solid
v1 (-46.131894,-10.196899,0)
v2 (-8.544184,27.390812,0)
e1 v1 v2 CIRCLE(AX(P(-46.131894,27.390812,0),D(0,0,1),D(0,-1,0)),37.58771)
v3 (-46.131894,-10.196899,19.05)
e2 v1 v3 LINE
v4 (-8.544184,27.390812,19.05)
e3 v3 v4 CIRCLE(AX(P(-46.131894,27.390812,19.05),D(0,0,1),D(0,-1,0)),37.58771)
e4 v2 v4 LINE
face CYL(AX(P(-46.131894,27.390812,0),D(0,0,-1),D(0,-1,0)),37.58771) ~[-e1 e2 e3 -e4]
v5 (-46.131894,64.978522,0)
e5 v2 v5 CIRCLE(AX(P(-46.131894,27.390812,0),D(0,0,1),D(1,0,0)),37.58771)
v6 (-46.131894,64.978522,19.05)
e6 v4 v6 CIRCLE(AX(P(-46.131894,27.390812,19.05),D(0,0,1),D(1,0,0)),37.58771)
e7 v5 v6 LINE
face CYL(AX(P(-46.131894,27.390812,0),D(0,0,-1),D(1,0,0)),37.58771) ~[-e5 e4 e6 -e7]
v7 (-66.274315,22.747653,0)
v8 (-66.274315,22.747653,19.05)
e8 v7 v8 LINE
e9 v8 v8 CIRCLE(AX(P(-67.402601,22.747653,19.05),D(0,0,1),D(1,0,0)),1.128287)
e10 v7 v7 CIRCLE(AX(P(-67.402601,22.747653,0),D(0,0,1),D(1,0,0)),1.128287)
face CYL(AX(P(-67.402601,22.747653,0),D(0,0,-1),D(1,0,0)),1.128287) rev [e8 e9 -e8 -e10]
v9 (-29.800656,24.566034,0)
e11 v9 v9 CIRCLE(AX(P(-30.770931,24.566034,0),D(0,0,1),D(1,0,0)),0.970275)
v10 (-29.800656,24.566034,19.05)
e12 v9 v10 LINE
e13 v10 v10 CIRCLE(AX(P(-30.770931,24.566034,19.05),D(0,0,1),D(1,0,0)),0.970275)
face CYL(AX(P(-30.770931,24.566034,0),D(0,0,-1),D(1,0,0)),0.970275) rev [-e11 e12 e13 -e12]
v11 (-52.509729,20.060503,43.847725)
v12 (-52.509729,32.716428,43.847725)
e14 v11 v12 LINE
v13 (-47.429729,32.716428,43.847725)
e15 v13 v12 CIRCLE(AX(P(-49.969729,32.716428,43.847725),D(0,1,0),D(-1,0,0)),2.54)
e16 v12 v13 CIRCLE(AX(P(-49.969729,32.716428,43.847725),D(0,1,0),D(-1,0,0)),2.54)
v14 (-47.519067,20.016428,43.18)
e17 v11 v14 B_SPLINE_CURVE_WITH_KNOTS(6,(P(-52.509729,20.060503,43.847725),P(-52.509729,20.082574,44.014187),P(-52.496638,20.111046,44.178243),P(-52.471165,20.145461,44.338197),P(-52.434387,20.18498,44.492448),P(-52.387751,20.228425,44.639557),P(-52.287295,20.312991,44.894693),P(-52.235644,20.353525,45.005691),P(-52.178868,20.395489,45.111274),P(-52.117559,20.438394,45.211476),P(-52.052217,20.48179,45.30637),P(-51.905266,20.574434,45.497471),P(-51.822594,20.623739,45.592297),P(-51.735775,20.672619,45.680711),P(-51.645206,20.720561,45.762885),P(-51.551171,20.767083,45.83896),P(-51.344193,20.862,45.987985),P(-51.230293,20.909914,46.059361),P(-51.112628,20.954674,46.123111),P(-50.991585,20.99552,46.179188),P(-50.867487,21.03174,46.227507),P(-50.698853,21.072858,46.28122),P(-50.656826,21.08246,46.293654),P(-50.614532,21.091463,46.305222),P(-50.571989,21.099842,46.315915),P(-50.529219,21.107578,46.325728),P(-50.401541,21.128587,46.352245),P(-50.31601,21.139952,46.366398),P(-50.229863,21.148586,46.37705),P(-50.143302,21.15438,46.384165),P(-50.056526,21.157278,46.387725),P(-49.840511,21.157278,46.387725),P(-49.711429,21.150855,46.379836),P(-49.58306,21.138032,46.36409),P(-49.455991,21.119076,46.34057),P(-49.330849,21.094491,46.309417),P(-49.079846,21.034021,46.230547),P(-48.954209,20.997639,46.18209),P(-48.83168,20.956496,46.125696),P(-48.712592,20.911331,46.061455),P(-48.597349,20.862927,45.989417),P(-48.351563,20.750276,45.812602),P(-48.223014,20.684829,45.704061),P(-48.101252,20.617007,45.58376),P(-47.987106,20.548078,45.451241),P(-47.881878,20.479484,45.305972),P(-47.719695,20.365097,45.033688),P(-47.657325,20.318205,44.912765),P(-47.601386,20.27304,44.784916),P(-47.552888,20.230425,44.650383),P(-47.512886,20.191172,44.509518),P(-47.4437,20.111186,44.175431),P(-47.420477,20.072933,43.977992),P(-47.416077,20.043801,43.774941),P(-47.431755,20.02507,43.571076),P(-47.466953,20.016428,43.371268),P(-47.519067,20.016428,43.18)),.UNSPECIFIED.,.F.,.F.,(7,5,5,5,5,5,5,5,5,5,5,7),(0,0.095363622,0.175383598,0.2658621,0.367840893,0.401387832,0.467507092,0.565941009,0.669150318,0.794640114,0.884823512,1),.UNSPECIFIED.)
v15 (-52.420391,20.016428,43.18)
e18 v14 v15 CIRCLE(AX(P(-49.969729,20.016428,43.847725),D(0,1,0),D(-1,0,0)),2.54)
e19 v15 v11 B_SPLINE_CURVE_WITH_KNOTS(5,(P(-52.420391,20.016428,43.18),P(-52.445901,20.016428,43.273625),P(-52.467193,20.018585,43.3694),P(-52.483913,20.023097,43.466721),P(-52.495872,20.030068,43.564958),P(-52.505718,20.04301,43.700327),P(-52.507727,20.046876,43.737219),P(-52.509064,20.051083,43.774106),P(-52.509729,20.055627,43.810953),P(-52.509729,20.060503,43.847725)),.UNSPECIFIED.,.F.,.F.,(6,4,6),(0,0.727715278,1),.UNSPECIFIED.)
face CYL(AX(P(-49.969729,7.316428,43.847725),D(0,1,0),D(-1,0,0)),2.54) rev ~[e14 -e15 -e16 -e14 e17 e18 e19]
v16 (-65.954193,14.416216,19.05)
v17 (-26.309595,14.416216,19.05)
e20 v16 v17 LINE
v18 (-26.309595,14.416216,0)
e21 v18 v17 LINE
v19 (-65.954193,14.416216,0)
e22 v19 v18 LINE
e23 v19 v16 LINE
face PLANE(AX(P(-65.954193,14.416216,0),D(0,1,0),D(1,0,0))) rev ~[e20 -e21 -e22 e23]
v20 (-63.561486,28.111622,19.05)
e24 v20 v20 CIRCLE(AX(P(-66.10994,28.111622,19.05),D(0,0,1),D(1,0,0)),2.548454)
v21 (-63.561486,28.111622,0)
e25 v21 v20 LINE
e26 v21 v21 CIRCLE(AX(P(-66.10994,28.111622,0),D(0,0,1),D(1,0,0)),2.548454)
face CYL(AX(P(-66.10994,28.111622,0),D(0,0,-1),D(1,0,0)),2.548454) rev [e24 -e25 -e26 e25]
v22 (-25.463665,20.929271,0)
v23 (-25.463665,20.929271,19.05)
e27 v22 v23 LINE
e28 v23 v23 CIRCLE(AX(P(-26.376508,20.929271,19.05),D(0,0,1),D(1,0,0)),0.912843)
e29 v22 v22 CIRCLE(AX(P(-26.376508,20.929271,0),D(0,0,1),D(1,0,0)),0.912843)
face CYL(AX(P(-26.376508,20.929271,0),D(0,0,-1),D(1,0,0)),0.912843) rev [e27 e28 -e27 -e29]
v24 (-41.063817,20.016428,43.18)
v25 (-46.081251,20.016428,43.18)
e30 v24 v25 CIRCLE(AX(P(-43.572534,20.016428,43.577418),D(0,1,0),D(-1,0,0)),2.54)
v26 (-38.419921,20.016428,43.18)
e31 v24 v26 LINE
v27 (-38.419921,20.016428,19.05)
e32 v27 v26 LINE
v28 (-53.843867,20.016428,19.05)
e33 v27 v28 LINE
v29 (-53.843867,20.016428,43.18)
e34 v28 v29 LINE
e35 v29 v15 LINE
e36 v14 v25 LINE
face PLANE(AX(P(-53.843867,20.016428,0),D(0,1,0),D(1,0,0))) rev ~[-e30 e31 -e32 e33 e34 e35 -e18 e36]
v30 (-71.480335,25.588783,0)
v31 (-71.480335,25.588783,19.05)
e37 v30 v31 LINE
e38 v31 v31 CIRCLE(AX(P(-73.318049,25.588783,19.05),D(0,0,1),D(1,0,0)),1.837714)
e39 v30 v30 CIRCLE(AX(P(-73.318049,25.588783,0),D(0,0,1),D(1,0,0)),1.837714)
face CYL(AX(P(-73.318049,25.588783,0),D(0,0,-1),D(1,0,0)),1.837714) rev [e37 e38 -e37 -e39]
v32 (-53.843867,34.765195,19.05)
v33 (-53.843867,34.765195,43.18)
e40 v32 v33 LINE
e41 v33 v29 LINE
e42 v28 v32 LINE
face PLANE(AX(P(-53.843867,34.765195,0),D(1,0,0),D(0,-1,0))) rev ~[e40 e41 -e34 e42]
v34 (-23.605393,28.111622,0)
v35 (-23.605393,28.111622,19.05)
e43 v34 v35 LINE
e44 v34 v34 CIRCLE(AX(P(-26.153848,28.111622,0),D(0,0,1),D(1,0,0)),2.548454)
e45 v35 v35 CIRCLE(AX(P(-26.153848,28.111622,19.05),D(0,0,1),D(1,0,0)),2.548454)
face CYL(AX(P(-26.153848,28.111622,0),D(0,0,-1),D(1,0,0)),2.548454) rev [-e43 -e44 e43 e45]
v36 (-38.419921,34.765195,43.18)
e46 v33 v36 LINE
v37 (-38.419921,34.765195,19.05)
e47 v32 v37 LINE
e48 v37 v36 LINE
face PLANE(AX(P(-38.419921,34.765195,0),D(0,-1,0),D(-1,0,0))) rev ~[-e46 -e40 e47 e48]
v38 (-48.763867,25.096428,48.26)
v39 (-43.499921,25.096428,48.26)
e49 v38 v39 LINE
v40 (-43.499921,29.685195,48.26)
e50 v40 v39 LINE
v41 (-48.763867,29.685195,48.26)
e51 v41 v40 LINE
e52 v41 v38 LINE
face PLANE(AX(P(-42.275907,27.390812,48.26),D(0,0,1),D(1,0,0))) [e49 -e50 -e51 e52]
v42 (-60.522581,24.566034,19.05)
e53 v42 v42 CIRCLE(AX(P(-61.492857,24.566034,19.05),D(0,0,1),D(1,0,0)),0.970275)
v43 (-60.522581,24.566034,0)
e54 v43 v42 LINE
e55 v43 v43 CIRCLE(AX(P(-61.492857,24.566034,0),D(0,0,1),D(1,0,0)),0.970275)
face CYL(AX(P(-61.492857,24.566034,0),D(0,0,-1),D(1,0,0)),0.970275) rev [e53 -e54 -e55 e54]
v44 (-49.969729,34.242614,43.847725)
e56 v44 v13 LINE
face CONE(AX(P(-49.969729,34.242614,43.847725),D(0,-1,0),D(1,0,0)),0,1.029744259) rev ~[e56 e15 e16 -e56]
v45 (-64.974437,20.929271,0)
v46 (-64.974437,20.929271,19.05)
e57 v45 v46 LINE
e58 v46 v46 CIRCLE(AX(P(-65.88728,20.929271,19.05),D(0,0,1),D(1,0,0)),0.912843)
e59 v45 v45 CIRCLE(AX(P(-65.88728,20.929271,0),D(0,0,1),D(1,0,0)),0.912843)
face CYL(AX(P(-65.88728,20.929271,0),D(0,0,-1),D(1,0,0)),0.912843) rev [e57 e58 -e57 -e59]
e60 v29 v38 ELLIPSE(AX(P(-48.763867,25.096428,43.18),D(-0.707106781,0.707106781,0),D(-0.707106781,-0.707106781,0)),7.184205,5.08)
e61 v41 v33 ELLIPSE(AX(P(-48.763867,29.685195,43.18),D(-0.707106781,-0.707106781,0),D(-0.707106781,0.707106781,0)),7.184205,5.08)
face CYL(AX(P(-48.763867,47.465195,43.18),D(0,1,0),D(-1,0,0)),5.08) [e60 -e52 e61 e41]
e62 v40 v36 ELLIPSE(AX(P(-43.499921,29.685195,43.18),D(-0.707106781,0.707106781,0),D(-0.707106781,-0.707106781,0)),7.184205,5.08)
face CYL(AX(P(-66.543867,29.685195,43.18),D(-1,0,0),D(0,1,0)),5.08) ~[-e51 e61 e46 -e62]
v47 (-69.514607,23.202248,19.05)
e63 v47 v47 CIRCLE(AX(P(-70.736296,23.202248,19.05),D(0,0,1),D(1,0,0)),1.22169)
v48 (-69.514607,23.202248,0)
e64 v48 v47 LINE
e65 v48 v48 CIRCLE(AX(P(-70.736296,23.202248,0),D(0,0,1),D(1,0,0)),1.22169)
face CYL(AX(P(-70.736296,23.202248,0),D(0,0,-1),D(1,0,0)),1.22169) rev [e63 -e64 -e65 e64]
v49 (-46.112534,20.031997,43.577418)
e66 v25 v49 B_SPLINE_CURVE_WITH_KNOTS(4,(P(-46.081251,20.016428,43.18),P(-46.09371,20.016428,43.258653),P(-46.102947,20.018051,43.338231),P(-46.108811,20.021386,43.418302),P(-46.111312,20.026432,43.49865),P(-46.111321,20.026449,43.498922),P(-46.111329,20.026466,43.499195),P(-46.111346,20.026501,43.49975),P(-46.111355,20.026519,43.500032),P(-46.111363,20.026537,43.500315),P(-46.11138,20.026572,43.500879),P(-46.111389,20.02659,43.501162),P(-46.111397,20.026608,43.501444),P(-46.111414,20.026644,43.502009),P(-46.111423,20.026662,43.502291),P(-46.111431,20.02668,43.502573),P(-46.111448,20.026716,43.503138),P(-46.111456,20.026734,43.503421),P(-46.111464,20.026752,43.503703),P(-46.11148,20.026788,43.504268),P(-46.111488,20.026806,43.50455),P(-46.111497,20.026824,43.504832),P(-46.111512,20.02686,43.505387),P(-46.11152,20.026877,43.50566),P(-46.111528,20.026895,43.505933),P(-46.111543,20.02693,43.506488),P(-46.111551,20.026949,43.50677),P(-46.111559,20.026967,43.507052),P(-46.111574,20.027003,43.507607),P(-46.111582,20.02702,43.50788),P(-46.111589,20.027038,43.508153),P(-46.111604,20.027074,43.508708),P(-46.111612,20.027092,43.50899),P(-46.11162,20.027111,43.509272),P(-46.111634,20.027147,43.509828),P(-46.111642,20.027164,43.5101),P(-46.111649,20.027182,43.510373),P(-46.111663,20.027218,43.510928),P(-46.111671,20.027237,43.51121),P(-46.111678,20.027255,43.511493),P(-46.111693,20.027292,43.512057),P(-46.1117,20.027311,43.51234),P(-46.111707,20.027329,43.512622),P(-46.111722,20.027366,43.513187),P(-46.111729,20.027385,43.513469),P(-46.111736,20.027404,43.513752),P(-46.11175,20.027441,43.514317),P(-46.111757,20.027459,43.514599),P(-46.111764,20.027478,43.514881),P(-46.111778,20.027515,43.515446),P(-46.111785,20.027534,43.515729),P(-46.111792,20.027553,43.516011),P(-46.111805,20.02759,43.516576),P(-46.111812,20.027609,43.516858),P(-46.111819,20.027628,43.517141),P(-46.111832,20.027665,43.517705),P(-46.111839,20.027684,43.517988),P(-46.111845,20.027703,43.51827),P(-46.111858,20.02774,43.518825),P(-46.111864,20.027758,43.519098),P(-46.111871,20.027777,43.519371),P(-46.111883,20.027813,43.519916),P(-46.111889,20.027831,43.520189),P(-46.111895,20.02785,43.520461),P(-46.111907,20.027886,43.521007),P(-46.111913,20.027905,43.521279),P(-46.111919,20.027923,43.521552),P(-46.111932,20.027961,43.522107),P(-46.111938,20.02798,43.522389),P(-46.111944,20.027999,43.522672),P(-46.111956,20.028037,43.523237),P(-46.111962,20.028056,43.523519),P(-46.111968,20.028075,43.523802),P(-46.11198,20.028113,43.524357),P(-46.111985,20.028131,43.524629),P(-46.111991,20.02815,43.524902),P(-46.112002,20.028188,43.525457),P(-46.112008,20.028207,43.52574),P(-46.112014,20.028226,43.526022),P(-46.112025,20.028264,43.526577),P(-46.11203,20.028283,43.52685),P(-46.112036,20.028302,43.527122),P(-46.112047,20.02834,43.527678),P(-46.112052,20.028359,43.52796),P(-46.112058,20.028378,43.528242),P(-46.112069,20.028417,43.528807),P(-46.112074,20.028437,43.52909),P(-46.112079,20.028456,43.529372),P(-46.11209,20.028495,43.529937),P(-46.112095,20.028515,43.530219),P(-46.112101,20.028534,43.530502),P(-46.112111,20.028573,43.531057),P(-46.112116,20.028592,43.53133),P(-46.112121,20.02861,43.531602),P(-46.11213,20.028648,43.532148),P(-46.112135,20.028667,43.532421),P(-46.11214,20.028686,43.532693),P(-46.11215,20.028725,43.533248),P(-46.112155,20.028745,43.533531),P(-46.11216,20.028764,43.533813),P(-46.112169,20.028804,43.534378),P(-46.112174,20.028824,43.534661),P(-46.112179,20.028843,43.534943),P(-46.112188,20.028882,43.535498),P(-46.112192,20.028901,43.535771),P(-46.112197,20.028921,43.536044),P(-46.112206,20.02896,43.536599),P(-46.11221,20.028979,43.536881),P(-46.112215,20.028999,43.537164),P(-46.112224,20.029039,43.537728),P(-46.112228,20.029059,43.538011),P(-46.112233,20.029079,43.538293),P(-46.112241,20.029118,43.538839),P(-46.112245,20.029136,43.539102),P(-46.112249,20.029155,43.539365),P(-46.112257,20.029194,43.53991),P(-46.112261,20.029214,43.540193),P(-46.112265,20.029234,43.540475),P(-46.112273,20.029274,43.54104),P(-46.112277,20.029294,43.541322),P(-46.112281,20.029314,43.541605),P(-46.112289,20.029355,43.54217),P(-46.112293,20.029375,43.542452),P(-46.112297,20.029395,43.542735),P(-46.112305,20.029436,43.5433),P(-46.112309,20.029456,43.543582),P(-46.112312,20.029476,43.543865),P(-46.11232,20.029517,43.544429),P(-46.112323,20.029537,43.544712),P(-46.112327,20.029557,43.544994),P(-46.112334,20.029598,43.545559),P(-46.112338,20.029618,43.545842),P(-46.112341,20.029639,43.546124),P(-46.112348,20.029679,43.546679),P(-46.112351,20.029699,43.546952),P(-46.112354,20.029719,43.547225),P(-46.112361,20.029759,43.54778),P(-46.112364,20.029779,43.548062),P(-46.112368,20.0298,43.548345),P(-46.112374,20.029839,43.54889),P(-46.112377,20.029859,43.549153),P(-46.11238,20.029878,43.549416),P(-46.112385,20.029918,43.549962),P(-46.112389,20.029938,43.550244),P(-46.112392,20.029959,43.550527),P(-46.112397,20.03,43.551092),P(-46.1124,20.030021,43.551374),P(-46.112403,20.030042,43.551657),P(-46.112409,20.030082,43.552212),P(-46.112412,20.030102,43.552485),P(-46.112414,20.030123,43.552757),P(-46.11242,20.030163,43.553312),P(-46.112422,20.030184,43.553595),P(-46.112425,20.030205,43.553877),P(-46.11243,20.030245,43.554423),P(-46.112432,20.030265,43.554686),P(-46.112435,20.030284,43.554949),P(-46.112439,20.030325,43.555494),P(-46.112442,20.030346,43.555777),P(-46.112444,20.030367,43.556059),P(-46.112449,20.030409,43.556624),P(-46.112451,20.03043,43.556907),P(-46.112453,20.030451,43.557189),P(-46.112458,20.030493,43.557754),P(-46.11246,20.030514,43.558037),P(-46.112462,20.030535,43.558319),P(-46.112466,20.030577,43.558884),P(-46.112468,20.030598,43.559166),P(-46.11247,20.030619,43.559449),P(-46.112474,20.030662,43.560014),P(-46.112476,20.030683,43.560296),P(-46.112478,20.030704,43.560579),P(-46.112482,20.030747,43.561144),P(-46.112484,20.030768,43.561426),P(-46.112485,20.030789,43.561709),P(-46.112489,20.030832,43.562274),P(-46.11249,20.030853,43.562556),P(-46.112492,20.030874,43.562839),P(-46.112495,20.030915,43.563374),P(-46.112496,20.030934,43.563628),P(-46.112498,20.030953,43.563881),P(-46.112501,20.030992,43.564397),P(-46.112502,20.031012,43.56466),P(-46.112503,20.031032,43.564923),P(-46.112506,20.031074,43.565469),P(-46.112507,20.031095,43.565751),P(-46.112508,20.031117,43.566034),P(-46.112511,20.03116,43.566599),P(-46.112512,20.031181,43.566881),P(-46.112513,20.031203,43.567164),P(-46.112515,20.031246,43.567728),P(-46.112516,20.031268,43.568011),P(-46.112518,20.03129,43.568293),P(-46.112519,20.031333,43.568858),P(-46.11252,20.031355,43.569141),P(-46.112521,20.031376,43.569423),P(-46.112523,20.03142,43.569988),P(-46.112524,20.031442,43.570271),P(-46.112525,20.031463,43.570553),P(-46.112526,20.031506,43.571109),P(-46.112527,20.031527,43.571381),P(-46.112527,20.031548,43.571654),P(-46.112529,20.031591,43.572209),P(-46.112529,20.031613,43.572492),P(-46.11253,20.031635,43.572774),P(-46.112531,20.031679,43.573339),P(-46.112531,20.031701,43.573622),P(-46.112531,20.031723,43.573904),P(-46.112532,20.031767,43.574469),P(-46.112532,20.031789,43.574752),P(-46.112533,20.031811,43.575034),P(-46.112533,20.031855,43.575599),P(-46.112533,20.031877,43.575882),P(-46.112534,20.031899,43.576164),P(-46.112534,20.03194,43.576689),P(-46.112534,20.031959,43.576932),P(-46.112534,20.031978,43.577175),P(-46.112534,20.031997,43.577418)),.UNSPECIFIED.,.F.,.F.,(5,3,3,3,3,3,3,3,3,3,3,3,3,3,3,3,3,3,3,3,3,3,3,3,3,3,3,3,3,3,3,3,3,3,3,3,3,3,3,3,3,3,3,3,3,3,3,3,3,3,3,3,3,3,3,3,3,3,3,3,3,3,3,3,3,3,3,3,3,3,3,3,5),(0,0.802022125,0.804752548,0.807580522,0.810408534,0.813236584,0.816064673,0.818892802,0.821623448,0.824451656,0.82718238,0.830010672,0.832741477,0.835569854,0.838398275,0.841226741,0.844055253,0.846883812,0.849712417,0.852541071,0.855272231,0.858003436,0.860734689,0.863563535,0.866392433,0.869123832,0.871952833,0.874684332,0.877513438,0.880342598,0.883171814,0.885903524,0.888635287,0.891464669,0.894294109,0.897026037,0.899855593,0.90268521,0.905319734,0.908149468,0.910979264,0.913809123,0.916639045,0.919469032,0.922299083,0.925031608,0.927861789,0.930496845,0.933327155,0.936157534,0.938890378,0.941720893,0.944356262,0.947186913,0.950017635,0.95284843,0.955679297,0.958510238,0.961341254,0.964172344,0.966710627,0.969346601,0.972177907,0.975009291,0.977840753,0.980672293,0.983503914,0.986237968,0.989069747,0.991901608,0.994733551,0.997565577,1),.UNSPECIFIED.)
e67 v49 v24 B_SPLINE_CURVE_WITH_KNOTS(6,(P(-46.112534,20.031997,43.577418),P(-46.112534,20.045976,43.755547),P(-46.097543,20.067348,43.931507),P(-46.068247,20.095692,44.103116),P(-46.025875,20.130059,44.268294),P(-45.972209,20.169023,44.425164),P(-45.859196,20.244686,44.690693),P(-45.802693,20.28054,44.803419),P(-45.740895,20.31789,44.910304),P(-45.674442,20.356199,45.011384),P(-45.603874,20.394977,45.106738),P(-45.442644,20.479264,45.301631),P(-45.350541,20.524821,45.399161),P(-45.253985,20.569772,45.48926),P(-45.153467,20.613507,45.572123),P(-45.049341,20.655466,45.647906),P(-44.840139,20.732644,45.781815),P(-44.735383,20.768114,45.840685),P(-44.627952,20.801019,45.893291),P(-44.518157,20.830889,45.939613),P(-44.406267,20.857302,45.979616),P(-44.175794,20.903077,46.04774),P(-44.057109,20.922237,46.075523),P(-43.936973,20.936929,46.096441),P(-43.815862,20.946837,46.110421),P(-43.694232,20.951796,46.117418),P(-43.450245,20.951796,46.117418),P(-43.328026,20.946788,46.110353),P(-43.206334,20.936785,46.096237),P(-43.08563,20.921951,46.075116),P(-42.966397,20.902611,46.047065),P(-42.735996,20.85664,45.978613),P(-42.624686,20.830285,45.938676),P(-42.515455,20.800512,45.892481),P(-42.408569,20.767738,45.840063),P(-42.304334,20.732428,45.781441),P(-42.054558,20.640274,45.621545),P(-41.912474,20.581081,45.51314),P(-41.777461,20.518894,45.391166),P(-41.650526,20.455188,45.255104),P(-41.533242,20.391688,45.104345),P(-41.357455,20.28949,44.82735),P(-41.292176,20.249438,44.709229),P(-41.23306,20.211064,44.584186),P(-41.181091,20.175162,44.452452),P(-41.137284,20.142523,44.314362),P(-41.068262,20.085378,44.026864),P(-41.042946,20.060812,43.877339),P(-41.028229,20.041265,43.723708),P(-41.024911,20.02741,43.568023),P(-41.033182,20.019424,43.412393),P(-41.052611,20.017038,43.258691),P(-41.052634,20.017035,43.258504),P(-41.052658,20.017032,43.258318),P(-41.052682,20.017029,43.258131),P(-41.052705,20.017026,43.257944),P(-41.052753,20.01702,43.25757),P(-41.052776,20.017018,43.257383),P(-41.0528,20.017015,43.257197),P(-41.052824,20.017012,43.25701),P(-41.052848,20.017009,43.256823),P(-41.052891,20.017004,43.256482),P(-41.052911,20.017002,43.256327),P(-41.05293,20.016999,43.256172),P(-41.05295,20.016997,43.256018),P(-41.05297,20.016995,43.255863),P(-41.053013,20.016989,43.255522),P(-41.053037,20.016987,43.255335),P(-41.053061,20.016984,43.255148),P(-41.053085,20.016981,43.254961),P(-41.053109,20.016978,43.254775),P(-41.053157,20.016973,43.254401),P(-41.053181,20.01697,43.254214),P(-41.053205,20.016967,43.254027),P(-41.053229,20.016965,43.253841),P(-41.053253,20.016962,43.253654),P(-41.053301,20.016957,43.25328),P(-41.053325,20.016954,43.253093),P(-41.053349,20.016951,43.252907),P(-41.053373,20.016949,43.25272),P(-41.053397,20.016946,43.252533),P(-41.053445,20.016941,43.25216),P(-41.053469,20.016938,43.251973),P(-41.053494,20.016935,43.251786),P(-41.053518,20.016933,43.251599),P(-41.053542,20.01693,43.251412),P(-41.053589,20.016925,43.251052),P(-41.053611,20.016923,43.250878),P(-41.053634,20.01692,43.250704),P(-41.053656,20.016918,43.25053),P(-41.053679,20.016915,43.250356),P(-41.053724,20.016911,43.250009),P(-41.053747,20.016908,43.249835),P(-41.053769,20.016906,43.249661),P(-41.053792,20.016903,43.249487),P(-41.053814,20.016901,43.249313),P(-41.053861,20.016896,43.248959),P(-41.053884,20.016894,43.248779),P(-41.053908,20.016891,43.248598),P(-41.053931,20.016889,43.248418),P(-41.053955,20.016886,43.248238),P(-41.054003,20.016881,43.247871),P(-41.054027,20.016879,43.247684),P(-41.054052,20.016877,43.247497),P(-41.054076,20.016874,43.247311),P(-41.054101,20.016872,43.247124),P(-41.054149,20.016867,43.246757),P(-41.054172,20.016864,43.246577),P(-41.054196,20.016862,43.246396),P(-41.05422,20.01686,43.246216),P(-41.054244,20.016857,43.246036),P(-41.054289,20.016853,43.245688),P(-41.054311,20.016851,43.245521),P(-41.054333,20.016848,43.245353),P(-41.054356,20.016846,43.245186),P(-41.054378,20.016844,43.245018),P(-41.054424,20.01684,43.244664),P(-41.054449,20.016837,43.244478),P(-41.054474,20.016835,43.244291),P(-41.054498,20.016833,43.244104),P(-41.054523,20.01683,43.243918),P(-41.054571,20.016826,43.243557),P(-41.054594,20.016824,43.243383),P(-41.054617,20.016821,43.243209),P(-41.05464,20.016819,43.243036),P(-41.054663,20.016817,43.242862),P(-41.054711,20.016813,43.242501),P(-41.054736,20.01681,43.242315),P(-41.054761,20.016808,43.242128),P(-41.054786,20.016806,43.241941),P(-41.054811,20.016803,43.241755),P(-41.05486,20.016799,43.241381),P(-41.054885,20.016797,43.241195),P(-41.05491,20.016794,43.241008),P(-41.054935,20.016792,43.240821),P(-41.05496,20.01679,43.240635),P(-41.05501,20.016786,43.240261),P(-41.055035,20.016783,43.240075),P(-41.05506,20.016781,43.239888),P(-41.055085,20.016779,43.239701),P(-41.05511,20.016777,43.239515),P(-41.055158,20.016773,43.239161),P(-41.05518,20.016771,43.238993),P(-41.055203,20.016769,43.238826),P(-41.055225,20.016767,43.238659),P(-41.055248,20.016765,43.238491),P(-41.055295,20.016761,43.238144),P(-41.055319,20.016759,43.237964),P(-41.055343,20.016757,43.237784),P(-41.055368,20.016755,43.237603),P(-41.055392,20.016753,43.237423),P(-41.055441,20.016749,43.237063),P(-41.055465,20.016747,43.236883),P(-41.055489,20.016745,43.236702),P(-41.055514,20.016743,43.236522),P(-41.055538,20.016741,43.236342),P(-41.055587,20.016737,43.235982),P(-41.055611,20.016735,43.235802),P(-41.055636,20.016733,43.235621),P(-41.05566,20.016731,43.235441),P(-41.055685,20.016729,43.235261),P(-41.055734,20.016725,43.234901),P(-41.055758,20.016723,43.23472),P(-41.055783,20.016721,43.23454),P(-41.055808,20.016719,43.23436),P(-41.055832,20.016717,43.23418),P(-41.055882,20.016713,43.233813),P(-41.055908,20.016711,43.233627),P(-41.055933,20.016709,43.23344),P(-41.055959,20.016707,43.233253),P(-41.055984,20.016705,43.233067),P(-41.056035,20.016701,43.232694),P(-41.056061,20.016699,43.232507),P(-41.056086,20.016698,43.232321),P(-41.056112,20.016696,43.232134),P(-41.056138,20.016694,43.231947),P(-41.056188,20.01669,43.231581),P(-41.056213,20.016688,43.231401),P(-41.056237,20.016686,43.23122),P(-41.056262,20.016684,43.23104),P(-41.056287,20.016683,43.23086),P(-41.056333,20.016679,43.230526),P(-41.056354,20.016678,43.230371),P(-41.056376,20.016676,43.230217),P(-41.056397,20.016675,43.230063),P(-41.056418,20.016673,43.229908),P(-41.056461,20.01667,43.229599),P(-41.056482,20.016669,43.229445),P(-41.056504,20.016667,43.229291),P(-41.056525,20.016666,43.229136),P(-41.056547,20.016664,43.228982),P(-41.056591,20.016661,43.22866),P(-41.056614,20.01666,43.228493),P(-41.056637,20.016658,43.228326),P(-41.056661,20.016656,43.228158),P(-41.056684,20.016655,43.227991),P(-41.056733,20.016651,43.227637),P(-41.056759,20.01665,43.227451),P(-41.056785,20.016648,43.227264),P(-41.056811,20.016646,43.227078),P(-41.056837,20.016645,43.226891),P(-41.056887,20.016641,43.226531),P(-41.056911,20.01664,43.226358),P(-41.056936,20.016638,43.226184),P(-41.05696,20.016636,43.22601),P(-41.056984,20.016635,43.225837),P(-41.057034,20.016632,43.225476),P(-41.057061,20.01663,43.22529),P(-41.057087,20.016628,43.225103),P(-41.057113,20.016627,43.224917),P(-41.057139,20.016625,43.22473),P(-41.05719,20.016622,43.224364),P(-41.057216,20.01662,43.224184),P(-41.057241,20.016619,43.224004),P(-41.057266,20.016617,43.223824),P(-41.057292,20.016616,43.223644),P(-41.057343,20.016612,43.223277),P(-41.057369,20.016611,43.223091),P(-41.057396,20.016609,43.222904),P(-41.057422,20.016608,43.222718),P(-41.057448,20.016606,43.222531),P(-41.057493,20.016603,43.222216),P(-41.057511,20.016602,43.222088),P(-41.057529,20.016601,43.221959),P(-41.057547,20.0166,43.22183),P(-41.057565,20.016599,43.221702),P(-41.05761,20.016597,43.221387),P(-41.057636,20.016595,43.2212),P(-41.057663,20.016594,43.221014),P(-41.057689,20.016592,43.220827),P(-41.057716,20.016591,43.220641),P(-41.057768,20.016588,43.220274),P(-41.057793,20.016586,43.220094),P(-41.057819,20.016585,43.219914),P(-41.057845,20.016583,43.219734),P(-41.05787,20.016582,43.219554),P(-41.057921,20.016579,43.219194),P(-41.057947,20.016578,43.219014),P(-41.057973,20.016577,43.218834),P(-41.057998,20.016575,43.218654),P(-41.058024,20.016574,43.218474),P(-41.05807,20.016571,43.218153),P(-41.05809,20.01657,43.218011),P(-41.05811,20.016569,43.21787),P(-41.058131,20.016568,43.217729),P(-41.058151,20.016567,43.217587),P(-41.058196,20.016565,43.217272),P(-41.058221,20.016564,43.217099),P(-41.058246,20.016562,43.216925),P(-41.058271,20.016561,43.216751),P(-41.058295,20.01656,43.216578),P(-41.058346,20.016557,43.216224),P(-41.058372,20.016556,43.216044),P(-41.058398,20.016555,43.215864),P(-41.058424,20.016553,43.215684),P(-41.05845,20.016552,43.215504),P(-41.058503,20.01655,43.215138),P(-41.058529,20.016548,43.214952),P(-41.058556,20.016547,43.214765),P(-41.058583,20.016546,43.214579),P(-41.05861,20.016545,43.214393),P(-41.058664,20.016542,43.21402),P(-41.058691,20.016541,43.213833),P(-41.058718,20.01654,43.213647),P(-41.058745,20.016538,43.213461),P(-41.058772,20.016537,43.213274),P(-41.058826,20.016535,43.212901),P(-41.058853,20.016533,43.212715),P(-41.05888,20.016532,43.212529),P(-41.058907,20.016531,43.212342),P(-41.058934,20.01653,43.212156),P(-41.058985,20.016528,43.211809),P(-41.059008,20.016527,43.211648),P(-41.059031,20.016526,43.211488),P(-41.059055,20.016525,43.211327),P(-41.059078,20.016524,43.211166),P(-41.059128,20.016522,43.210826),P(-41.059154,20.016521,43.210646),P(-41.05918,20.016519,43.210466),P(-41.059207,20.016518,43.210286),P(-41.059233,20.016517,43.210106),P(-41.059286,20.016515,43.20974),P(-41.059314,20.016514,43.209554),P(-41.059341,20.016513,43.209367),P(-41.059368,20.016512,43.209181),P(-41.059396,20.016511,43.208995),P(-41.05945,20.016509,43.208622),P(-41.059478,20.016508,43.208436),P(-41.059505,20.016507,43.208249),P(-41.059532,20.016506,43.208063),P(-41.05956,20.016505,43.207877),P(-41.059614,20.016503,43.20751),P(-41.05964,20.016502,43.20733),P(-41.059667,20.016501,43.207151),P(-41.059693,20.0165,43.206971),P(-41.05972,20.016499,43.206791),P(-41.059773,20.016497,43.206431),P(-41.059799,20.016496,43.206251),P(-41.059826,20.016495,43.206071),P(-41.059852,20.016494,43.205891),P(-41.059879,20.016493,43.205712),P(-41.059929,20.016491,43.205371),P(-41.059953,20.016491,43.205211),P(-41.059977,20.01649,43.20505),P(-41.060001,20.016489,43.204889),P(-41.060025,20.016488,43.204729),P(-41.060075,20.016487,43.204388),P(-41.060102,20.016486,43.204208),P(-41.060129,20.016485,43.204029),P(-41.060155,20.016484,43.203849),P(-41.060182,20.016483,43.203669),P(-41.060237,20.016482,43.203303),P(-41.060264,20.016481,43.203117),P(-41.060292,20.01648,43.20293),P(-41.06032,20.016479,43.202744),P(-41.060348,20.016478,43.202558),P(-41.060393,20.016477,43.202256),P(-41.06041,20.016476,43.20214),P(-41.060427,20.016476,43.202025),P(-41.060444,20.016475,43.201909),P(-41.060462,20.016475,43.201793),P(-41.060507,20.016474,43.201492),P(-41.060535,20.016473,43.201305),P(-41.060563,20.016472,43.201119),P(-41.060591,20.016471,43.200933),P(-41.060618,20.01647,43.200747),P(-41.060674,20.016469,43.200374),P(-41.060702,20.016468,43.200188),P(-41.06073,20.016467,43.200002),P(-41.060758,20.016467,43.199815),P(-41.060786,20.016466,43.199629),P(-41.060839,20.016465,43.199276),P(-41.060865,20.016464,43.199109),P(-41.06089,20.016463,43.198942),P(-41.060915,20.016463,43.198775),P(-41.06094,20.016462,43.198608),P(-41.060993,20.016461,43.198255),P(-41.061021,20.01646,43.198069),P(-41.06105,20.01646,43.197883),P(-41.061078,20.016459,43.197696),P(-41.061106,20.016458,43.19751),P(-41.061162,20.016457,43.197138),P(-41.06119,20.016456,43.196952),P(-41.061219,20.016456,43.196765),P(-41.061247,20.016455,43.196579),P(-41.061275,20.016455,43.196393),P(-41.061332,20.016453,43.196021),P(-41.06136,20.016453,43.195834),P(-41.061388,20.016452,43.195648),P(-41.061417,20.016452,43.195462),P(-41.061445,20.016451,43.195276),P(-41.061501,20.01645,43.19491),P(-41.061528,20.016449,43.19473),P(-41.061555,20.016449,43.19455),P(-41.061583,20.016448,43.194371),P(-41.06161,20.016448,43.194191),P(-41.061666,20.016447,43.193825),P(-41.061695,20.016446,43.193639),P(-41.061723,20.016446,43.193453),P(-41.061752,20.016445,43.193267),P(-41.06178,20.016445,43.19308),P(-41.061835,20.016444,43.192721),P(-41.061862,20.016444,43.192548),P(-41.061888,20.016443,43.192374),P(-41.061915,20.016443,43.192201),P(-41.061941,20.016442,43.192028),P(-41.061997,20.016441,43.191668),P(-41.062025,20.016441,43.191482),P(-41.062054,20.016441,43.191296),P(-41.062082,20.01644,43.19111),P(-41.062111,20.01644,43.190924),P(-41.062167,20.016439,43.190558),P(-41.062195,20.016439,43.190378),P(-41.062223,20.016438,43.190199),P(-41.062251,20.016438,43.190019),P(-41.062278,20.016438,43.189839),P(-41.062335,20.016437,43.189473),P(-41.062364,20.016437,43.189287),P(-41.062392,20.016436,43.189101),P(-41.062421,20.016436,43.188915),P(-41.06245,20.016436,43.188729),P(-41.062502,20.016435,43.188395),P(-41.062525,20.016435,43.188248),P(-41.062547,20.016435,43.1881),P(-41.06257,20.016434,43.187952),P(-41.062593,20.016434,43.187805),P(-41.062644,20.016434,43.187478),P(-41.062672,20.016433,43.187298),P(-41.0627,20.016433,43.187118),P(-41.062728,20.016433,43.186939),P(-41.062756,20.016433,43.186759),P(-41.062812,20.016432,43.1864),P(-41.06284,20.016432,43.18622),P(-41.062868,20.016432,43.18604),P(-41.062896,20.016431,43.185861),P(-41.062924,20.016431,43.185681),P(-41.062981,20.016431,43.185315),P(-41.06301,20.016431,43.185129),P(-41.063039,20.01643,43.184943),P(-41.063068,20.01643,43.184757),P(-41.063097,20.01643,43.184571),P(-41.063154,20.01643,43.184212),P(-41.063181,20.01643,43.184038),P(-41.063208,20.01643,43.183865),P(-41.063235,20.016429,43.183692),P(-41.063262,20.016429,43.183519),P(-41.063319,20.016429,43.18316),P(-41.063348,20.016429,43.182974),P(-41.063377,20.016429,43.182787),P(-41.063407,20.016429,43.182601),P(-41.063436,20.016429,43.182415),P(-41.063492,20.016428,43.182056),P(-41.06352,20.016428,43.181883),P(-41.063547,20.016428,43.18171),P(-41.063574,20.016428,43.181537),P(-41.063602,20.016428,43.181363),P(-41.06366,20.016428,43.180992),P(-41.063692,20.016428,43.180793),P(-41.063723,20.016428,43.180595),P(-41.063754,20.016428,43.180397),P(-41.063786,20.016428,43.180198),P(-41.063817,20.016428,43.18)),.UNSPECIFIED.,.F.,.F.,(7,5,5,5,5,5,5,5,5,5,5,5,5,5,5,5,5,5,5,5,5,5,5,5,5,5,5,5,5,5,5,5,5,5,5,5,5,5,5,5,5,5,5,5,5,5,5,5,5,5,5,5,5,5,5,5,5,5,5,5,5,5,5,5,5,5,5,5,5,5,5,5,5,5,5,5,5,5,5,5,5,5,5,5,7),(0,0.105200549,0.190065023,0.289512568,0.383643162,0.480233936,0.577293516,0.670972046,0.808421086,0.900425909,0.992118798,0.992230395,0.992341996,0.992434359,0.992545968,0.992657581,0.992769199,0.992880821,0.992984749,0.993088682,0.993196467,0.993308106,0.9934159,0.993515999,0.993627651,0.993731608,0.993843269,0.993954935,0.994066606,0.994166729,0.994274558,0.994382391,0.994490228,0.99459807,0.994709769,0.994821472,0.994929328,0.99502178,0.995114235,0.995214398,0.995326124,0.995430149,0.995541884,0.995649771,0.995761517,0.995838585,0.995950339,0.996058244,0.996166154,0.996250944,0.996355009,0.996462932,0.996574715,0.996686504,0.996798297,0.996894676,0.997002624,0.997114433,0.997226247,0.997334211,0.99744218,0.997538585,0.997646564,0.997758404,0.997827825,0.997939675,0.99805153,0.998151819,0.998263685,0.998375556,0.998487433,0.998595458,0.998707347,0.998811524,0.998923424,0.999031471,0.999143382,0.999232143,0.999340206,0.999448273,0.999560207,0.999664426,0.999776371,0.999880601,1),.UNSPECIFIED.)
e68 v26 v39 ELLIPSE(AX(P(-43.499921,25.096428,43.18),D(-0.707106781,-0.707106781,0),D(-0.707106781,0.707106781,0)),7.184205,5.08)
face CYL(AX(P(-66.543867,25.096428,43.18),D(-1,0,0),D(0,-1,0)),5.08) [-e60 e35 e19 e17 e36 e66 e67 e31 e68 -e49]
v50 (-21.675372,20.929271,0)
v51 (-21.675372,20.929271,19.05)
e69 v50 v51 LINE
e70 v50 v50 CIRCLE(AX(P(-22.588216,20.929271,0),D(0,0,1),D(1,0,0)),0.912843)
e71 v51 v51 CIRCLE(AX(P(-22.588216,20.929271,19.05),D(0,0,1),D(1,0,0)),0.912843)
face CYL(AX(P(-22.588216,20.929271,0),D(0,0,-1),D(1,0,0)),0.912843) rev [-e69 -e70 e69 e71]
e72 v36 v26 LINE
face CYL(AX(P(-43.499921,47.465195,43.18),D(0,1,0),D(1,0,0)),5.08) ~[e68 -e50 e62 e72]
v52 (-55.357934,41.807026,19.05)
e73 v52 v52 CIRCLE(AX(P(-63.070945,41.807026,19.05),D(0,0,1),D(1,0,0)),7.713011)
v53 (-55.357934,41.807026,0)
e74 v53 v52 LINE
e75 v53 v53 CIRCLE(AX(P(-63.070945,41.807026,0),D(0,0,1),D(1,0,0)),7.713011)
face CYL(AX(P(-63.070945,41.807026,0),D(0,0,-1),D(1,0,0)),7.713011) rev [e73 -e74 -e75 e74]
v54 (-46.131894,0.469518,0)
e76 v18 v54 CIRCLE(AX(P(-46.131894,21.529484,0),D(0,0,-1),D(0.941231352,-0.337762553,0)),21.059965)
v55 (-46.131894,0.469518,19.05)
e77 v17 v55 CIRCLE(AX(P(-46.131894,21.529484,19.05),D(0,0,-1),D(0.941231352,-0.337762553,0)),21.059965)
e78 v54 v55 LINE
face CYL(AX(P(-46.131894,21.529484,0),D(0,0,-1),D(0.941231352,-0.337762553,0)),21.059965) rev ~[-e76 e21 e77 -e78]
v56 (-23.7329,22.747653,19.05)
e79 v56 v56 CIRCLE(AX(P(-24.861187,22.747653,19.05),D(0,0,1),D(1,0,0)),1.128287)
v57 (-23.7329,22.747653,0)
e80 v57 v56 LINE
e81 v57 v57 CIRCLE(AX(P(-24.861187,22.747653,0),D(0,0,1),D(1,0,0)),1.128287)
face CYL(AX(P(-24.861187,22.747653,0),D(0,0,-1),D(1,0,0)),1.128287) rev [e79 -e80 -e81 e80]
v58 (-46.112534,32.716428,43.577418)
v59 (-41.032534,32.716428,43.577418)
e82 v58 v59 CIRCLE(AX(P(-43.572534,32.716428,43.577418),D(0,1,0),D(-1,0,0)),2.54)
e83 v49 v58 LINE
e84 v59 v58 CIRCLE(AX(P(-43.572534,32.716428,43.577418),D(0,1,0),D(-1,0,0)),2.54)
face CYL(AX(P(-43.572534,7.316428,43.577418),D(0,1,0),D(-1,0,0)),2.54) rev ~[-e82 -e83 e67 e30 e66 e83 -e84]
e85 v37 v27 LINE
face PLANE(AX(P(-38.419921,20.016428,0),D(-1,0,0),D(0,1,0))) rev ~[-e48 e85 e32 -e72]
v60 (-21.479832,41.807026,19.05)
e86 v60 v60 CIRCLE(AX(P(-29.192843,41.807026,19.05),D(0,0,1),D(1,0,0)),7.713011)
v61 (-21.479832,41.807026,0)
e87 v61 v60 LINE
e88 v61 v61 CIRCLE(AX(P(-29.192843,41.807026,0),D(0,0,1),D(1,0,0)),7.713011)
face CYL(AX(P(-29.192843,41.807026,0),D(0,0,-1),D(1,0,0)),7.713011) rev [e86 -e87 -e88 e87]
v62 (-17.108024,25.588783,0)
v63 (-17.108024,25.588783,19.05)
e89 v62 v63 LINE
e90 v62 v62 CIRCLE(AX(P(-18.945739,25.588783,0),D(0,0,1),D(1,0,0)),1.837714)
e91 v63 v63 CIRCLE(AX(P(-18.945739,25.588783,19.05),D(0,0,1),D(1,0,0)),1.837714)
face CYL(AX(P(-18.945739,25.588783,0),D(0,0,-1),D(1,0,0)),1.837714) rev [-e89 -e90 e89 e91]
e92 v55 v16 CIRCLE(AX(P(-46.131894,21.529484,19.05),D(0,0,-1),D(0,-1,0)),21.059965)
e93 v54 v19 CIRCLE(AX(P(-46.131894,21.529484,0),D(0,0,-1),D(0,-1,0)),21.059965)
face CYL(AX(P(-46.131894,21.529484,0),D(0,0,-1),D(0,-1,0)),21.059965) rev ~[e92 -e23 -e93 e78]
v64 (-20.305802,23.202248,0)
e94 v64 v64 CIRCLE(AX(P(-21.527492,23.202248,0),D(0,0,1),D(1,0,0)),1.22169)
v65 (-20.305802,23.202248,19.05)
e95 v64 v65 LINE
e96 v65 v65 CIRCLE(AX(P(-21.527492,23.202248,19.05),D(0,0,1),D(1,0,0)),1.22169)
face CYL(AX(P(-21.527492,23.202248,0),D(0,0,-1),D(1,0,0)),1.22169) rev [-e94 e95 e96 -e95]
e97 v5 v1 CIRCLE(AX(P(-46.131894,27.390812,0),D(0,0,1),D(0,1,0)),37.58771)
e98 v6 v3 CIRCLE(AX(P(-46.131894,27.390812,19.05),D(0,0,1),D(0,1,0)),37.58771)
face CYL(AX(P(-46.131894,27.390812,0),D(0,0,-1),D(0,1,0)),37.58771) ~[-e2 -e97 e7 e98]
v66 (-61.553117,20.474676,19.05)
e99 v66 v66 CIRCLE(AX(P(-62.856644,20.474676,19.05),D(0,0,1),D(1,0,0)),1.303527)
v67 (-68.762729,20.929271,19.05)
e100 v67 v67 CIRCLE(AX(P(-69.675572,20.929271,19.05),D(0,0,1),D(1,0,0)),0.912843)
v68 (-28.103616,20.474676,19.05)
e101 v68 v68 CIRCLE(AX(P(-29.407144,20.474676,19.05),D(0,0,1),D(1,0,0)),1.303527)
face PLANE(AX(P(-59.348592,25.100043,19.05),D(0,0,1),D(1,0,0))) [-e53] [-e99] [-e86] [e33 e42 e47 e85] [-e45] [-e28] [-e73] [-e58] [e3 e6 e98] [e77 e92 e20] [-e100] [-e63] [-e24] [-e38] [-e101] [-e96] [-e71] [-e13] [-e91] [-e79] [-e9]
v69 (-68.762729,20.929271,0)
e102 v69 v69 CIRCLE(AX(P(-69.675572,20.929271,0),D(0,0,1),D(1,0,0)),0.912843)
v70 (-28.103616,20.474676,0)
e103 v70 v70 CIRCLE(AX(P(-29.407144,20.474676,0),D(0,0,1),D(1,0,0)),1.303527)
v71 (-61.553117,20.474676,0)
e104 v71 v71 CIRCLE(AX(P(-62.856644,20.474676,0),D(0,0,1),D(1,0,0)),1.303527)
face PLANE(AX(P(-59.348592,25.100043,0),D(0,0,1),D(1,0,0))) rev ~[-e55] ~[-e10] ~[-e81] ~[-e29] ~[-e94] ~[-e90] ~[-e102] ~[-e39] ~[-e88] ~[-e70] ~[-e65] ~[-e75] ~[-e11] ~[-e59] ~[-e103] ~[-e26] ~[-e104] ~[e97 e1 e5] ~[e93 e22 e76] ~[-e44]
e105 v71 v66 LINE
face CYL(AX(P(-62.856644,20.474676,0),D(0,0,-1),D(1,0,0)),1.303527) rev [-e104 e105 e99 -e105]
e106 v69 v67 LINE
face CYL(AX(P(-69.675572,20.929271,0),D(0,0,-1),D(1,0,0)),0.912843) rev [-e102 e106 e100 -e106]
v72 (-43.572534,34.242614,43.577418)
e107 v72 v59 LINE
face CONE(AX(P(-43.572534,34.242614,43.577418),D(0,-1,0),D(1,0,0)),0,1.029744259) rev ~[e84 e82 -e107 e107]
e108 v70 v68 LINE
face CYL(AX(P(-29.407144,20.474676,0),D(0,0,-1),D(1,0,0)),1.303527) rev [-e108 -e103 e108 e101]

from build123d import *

# Parameters (mm, degrees)
F0_R        = 0.9128432721
F0_R_2      = 1.2216898107
F0_R_3      = 1.8377143243
F0_R_4      = 1.1282865395
F0_R_5      = 1.3035270966
F0_R_6      = 0.9702753
F0_R_7      = 2.5484542397
F0_R_8      = 7.7130109431
F1_DEPTH    = 19.05
F2_DEPTH    = 48.26
F4_D        = 5.08
F4_DEPTH    = 12.7
F4_TIP      = 1.5261859723
F5_T1_DEPTH = 40.8239460826
F5_T3_DEPTH = 40.1487670183


# Not quite as in the source:
# - a fillet or chamfer that OpenCascade refuses, or shapes differently, is made with other operations: its cross-section is extruded or revolved along the edge and cut away or added


with BuildPart() as f1:
    # F0 (on Top) → F1 (new body)
    with BuildSketch(Plane.XY):
        with BuildLine():
            Line((-46.1318939924, 34.7651951015), (-46.1318939924, 64.978521944))
            ThreePointArc((-46.1318939924, 64.978521944), (-83.7196043441, 27.3908115923), (-46.1318939924, -10.1968987593))
            Line((-46.1318939924, -10.1968987593), (-46.1318939924, 0.4695183748))
            ThreePointArc((-46.1318939924, 0.4695183748), (-58.2504121537, 4.3055568595), (-65.9541934729, 14.4162159413))
            Line((-65.9541934729, 14.4162159413), (-46.1318939924, 14.4162159413))
            Line((-46.1318939924, 14.4162159413), (-46.1318939924, 20.0164280832))
            Line((-46.1318939924, 20.0164280832), (-53.8438670337, 20.0164280832))
            Line((-53.8438670337, 20.0164280832), (-53.8438670337, 34.7651951015))
            Line((-53.8438670337, 34.7651951015), (-46.1318939924, 34.7651951015))
        make_face()
        with Locations((-69.6755722165, 20.9292713553)):
            Circle(F0_R, mode=Mode.SUBTRACT)
        with Locations((-65.8872798085, 20.9292713553)):
            Circle(F0_R, mode=Mode.SUBTRACT)
        with Locations((-70.7362964749, 23.2022479177)):
            Circle(F0_R_2, mode=Mode.SUBTRACT)
        with Locations((-73.3180493116, 25.5887825042)):
            Circle(F0_R_3, mode=Mode.SUBTRACT)
        with Locations((-67.4026012421, 22.7476526052)):
            Circle(F0_R_4, mode=Mode.SUBTRACT)
        with Locations((-62.856644392, 20.4746760428)):
            Circle(F0_R_5, mode=Mode.SUBTRACT)
        with Locations((-61.4928565919, 24.5660338551)):
            Circle(F0_R_6, mode=Mode.SUBTRACT)
        with Locations((-66.1099404097, 28.1116217375)):
            Circle(F0_R_7, mode=Mode.SUBTRACT)
        with Locations((-63.0709454417, 41.807025671)):
            Circle(F0_R_8, mode=Mode.SUBTRACT)
        with BuildLine():
            ThreePointArc((-46.1318939924, -10.1968987593), (-19.5533691135, 0.8122867134), (-8.5441836408, 27.3908115923))
            ThreePointArc((-8.5441836408, 27.3908115923), (-19.5533691135, 53.9693364713), (-46.1318939924, 64.978521944))
            Line((-46.1318939924, 64.978521944), (-46.1318939924, 34.7651951015))
            Line((-46.1318939924, 34.7651951015), (-38.4199209511, 34.7651951015))
            Line((-38.4199209511, 34.7651951015), (-38.4199209511, 20.0164280832))
            Line((-38.4199209511, 20.0164280832), (-46.1318939924, 20.0164280832))
            Line((-46.1318939924, 20.0164280832), (-46.1318939924, 14.4162159413))
            Line((-46.1318939924, 14.4162159413), (-26.309594512, 14.4162159413))
            ThreePointArc((-26.309594512, 14.4162159413), (-34.0133758311, 4.3055568595), (-46.1318939924, 0.4695183748))
            Line((-46.1318939924, 0.4695183748), (-46.1318939924, -10.1968987593))
        make_face()
        with Locations((-29.4071435928, 20.4746760428)):
            Circle(F0_R_5, mode=Mode.SUBTRACT)
        with Locations((-30.7709313929, 24.5660338551)):
            Circle(F0_R_6, mode=Mode.SUBTRACT)
        with Locations((-26.3765081763, 20.9292713553)):
            Circle(F0_R, mode=Mode.SUBTRACT)
        with Locations((-22.5882157683, 20.9292713553)):
            Circle(F0_R, mode=Mode.SUBTRACT)
        with Locations((-24.8611867428, 22.7476526052)):
            Circle(F0_R_4, mode=Mode.SUBTRACT)
        with Locations((-21.5274915099, 23.2022479177)):
            Circle(F0_R_2, mode=Mode.SUBTRACT)
        with Locations((-18.9457386732, 25.5887825042)):
            Circle(F0_R_3, mode=Mode.SUBTRACT)
        with Locations((-29.1928425431, 41.807025671)):
            Circle(F0_R_8, mode=Mode.SUBTRACT)
        with Locations((-26.1538475752, 28.1116217375)):
            Circle(F0_R_7, mode=Mode.SUBTRACT)
    extrude(amount=F1_DEPTH)

    # F0 (on Top) → F2 (join)
    with BuildSketch(Plane.XY):
        Polygon((-38.4199209511, 34.7651951015), (-46.1318939924, 34.7651951015), (-46.1318939924, 27.3908115923), (-46.1318939924, 20.0164280832), (-38.4199209511, 20.0164280832), align=None)
        Polygon((-46.1318939924, 27.3908115923), (-46.1318939924, 34.7651951015), (-53.8438670337, 34.7651951015), (-53.8438670337, 20.0164280832), (-46.1318939924, 20.0164280832), align=None)
    extrude(amount=F2_DEPTH)

    # F4
    with Locations(Plane.XZ.offset(-20.0164280832)):
        with Locations((-49.9697290361, 43.8477247953), (-43.5725338757, 43.5774177313)):
            Hole(F4_D / 2, depth=F4_DEPTH)
            with Locations((0, 0, -(F4_DEPTH + F4_TIP / 2))):  # 118° drill point
                Cone(0, F4_D / 2, F4_TIP, mode=Mode.SUBTRACT)

    # F5: fillet of radius 5.08 on 4 edges, made by hand

    # F5_s2 → F5_t1 (cut)
    with BuildSketch(Plane.YZ.offset(-66.5438670337)):
        with BuildLine():
            ThreePointArc((34.7651951015, 43.18), (33.2772975499, 46.7721024484), (29.6851951015, 48.26))
            Line((29.6851951015, 48.26), (34.7651951015, 48.26))
            Line((34.7651951015, 48.26), (34.7651951015, 43.18))
        make_face()
        with BuildLine():
            ThreePointArc((20.0164280832, 43.18), (21.5043256348, 46.7721024484), (25.0964280832, 48.26))
            Line((25.0964280832, 48.26), (20.0164280832, 48.26))
            Line((20.0164280832, 48.26), (20.0164280832, 43.18))
        make_face()
    extrude(amount=F5_T1_DEPTH, mode=Mode.SUBTRACT)

    # F5_s4 → F5_t3 (cut)
    with BuildSketch(Plane.XZ.offset(-47.4651951015)):
        with BuildLine():
            ThreePointArc((-53.8438670337, 43.18), (-52.3559694821, 46.7721024484), (-48.7638670337, 48.26))
            Line((-48.7638670337, 48.26), (-53.8438670337, 48.26))
            Line((-53.8438670337, 48.26), (-53.8438670337, 43.18))
        make_face()
        with BuildLine():
            ThreePointArc((-38.4199209511, 43.18), (-39.9078185027, 46.7721024484), (-43.4999209511, 48.26))
            Line((-43.4999209511, 48.26), (-38.4199209511, 48.26))
            Line((-38.4199209511, 48.26), (-38.4199209511, 43.18))
        make_face()
    extrude(amount=F5_T3_DEPTH, mode=Mode.SUBTRACT)


solid = f1.part
